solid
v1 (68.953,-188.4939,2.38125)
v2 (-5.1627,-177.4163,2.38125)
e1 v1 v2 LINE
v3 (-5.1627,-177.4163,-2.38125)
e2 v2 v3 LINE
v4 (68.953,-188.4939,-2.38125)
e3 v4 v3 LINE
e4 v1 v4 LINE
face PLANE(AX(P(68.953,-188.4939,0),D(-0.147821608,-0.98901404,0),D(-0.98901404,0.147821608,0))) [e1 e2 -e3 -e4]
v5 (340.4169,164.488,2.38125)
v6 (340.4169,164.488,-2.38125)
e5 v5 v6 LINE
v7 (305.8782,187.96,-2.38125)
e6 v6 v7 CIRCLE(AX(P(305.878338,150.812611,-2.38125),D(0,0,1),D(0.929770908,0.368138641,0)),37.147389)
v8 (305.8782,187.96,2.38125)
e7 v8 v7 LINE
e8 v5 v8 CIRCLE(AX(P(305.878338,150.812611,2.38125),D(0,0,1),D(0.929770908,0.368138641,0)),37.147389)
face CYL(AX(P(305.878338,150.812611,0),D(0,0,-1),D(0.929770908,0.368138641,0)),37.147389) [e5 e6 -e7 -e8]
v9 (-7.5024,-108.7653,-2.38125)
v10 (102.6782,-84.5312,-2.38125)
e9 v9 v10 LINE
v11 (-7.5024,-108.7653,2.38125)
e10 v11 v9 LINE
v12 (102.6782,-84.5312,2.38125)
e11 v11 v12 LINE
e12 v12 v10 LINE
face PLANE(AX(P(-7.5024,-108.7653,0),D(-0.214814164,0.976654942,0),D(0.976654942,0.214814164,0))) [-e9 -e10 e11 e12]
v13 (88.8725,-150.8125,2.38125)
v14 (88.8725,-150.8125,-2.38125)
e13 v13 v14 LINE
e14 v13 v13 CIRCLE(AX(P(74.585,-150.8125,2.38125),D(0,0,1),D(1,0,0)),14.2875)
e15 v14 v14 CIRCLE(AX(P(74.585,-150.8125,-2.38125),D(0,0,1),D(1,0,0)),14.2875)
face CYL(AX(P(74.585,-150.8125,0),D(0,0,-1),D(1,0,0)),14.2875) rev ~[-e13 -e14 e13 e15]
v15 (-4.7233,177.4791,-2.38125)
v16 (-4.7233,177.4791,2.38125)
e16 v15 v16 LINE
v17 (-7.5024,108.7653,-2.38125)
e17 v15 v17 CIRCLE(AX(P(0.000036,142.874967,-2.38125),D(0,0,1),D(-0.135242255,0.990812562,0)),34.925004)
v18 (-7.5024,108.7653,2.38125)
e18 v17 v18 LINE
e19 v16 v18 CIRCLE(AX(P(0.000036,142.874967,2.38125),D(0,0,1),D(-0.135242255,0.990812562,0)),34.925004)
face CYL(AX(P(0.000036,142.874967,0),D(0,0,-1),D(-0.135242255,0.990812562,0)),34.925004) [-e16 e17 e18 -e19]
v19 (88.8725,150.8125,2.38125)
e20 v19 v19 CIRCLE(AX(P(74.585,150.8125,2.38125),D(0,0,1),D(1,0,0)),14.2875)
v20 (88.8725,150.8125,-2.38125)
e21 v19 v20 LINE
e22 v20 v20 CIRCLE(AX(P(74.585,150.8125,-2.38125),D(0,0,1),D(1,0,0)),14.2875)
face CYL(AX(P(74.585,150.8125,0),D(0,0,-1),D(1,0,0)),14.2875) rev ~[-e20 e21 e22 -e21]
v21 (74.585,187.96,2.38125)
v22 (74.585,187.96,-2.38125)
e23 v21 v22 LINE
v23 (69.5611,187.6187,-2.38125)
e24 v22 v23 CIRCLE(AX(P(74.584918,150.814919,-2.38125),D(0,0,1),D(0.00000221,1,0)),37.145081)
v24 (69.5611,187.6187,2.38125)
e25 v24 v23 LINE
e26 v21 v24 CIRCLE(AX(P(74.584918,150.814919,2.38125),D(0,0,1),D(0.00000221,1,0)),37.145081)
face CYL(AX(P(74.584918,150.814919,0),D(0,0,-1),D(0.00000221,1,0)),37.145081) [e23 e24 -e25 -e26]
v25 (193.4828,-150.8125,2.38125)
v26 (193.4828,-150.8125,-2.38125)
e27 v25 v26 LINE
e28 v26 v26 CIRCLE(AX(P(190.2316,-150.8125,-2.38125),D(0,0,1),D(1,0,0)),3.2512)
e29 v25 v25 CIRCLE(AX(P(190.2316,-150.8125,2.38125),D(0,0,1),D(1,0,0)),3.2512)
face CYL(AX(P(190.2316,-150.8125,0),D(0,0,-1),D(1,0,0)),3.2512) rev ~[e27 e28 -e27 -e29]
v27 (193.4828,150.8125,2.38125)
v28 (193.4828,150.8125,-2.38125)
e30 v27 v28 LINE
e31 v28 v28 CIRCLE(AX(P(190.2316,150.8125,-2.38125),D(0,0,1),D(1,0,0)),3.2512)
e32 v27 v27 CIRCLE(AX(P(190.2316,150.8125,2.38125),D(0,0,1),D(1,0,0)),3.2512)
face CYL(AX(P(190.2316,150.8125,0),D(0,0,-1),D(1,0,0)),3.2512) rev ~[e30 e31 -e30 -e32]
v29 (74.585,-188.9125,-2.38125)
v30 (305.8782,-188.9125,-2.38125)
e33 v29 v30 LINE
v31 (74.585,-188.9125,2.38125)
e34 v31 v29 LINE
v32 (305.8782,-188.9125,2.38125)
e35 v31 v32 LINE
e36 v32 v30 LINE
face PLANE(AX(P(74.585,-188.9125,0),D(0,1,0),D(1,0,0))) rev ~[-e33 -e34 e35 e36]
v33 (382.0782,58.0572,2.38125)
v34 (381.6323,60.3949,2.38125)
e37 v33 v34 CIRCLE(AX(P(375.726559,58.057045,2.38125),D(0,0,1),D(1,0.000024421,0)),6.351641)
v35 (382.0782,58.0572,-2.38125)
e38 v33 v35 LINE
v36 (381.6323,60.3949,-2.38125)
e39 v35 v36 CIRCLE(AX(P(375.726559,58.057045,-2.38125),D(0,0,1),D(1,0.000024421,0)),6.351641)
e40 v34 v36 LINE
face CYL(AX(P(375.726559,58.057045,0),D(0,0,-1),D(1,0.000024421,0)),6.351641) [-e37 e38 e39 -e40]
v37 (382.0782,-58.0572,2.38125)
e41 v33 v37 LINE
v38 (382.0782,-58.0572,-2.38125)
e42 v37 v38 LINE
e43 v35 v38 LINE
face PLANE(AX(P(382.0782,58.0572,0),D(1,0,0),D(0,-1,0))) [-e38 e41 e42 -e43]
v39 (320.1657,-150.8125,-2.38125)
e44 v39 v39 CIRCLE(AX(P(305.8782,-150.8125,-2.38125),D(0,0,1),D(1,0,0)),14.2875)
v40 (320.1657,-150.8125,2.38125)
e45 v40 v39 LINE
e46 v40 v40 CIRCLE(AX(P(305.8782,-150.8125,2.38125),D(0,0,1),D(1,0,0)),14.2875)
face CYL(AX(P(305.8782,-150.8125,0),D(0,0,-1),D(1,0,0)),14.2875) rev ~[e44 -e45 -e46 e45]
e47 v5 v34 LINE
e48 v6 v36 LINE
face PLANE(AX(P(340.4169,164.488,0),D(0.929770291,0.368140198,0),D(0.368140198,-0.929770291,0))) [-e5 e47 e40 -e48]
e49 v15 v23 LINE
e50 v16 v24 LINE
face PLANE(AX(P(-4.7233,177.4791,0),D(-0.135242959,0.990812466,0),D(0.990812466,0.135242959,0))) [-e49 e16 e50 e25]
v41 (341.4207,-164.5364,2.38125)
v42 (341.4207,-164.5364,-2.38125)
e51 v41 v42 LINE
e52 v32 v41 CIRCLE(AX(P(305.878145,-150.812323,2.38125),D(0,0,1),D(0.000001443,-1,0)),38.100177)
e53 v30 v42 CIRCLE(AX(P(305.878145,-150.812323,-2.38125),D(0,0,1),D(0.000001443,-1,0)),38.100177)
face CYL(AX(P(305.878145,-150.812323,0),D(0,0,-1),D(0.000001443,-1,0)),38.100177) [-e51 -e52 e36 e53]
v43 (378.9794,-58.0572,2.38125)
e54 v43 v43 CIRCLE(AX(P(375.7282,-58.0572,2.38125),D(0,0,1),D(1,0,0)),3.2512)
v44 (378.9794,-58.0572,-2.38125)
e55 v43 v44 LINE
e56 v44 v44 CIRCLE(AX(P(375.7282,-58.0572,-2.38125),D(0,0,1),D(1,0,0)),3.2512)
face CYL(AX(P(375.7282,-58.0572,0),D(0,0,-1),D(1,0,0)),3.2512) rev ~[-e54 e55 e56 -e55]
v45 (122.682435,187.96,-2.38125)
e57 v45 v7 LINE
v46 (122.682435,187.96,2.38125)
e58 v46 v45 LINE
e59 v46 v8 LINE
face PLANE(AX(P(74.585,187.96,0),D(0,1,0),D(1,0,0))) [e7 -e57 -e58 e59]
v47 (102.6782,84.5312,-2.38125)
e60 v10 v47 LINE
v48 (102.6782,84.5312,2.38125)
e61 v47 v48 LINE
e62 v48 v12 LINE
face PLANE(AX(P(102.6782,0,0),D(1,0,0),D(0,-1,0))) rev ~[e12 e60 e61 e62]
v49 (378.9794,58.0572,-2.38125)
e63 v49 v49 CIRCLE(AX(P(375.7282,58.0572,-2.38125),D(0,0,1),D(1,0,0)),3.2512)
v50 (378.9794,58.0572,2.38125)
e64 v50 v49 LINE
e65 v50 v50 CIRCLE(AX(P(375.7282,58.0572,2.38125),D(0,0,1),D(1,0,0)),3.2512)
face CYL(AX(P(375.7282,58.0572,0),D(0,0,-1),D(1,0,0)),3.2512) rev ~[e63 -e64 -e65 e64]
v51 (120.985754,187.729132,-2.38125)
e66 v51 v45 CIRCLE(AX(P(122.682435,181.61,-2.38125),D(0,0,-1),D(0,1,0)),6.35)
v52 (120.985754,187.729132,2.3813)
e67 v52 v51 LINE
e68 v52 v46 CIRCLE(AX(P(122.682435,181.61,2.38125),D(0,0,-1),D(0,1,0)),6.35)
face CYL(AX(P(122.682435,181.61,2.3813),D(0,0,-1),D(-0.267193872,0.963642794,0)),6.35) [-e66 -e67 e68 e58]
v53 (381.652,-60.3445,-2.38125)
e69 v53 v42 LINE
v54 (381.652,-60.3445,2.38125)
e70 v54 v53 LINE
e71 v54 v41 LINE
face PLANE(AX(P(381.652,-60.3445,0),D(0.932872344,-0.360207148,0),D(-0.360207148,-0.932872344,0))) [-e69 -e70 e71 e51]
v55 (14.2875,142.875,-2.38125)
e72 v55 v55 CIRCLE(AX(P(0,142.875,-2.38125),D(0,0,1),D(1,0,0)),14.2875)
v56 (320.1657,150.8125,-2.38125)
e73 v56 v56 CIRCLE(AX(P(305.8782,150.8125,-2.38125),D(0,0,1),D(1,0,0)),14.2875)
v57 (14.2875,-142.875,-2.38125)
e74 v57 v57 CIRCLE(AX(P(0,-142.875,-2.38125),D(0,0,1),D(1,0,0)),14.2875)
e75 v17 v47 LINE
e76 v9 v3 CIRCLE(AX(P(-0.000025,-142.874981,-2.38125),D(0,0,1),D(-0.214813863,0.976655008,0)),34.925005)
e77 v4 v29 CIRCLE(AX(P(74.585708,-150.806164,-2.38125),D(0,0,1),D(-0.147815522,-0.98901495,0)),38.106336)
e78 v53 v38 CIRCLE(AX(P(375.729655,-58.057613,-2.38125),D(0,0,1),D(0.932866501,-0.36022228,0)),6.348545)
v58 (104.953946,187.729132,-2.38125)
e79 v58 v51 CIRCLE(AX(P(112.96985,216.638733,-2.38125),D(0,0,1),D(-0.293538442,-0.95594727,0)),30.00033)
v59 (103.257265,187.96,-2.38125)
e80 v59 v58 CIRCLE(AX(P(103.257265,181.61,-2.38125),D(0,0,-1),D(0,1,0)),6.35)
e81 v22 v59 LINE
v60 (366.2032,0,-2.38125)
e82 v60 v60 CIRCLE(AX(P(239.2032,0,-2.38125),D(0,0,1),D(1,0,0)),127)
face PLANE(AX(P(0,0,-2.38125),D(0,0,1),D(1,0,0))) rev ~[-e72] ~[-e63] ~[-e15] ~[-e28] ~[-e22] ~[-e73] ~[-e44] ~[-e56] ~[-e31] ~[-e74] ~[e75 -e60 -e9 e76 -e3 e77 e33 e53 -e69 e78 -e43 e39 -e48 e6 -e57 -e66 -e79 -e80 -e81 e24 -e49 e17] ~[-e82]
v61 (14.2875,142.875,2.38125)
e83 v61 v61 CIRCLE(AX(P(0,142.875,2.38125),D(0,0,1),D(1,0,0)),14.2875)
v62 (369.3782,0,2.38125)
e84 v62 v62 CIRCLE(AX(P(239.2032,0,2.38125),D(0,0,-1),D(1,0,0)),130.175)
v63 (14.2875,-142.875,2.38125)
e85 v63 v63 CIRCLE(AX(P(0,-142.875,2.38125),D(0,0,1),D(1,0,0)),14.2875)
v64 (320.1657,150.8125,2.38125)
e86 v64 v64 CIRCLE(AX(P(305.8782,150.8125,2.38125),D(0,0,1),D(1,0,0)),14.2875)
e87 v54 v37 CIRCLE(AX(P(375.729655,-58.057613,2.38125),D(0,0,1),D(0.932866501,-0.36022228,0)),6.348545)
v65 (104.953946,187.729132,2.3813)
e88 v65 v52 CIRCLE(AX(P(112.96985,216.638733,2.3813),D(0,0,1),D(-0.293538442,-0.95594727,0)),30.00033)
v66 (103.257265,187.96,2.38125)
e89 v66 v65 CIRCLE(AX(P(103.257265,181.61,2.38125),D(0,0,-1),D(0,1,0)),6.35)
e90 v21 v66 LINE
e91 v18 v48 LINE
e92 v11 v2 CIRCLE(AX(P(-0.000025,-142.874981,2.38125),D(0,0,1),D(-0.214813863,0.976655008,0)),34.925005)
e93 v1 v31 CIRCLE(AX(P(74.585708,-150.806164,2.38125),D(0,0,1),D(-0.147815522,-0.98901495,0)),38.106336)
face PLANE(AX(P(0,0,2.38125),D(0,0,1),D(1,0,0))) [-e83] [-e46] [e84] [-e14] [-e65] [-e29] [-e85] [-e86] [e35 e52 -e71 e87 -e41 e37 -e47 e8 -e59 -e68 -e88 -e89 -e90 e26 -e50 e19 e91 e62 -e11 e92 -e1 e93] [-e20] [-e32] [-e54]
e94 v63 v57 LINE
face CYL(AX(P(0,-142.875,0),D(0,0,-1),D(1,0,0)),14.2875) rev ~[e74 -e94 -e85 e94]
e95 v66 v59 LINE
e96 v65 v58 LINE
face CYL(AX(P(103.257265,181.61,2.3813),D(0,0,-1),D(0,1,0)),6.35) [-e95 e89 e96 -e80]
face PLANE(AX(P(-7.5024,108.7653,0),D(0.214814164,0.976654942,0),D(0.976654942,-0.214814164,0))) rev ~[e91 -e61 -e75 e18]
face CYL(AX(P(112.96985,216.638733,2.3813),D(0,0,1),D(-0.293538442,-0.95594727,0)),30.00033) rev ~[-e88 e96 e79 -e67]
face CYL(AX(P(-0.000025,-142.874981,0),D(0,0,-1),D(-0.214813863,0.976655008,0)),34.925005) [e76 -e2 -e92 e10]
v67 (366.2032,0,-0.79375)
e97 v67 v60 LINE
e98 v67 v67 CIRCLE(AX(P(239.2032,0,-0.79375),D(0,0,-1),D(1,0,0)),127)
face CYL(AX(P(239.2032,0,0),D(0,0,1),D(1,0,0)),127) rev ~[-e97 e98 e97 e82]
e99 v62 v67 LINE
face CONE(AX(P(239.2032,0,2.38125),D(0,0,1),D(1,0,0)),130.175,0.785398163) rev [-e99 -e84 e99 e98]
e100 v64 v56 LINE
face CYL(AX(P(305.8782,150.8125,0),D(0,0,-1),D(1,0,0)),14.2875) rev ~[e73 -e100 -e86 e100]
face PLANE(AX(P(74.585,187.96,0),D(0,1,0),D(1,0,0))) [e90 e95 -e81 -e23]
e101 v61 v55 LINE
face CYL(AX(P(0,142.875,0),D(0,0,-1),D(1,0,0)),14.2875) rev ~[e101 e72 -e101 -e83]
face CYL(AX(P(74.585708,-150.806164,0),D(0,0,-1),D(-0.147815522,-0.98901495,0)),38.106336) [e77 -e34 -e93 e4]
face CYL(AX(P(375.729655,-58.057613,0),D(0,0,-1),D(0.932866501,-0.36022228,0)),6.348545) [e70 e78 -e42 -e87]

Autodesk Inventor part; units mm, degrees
ref_plane "YZ Plane" through (0, 0, 0) normal (1, 0, 0) x (0, 1, 0)
ref_plane "XZ Plane" through (0, 0, 0) normal (0, 1, 0) x (-1, 0, 0)
ref_plane "XY Plane" through (0, 0, 0) normal (0, 0, 1) x (1, 0, 0)
sketch "Sketch1" plane through (0, 0, 0) normal (0, 0, 1) x (1, 0, 0)
  circle A0 centre (0, 142.875) radius 63.5 construction
  circle A1 centre (0, 142.875) radius 25.4 construction
  circle A2 centre (0, -142.875) radius 25.4 construction
  circle A3 centre (0, -142.875) radius 63.5 construction
  line L0 (0, 79.375) -> (0, 79.375) construction
  line L1 (0, -79.375) -> (0, -79.375) construction
  line L2 (0, 0) -> (229.6782, 0) construction
  line L3 (0, 142.875) -> (305.8782, 142.875) construction
  line L4 (305.8782, 142.875) -> (305.8782, -142.875) construction
  line L5 (305.8782, -142.875) -> (0, -142.875) construction
  circle A4 centre (229.6782, 0) radius 127 construction
  circle A5 centre (0, 142.875) radius 14.2875
  circle A6 centre (0, -142.875) radius 14.2875
  circle A7 centre (0, 142.875) radius 34.925 construction
  circle A8 centre (0, -142.875) radius 34.925 construction
  circle A9 centre (74.585, -150.8125) radius 22.225 construction
  circle A10 centre (74.585, -150.8125) radius 33.3375 construction
  circle A11 centre (74.585, -150.8125) radius 11.1125 construction
  line L6 (74.585, -139.7) -> (74.585, -128.5875) construction
  line L7 (74.585, -117.475) -> (74.585, -128.5875) construction
  circle A12 centre (305.8782, -150.8125) radius 33.3375 construction
  circle A13 centre (305.8782, -150.8125) radius 14.2875
  circle A14 centre (375.7282, 58.0572) radius 6.35 construction
  circle A15 centre (375.7282, -58.0572) radius 6.35 construction
  line L8 (305.8782, 150.8125) -> (375.7282, 58.0572) construction
  line L9 (375.7282, 58.0572) -> (375.7282, -58.0572) construction
  line L10 (375.7282, -58.0572) -> (305.8782, -150.8125) construction
  line L11 (-117.6668, 84.5312) -> (102.6782, 84.5312) construction
  line L12 (102.6782, 84.5312) -> (102.6782, -84.5312) construction
  line L13 (102.6782, -84.5312) -> (-117.6668, -84.5312) construction
  line L14 (-117.6668, -84.5312) -> (-117.6668, 84.5312) construction
  line L15 (0, 142.875) -> (0, 84.5312) construction
  line L16 (0, -84.5312) -> (0, -142.875) construction
  circle A16 centre (74.585, -150.8125) radius 14.2875
  line L17 (74.585, -117.475) -> (305.8782, -117.475) construction
  circle A17 centre (74.585, 0) radius 127 construction
  circle A18 centre (0, 0) radius 127 construction
  circle A19 centre (0, 142.875) radius 6.35 construction
  circle A20 centre (74.585, 150.8125) radius 33.3375 construction
  circle A21 centre (305.8782, 150.8125) radius 33.3375 construction
  circle A22 centre (305.8782, 150.8125) radius 14.2875
  circle A23 centre (74.585, 150.8125) radius 14.2875
  circle A24 centre (74.585, 150.8125) radius 37.1475 construction
  circle A25 centre (305.8782, 150.8125) radius 37.1475 construction
  circle A26 centre (305.8782, -150.8125) radius 38.1 construction
  circle A27 centre (74.585, -150.8125) radius 38.1 construction
  line L18 (-4.7233, 177.4791) -> (69.5611, 187.6187)
  line L19 (74.585, 187.96) -> (305.8782, 187.96)
  line L20 (340.4169, 164.488) -> (381.6323, 60.3949)
  line L21 (382.0782, 58.0572) -> (382.0782, -58.0572)
  line L22 (68.953, -188.4939) -> (-5.1627, -177.4163)
  line L23 (221.4945, -245.7989) -> (238.8691, -293.5353) construction
  line L24 (238.8691, -293.5353) -> (382.0782, -241.4114) construction
  line L25 (382.0782, -241.4114) -> (364.7036, -193.675) construction
  line L26 (364.7036, -193.675) -> (221.4945, -245.7989) construction
  line L27 (-7.5024, -108.7653) -> (102.6782, -84.5312)
  line L28 (-7.5024, 108.7653) -> (102.6782, 84.5312)
  line L29 (102.6782, 84.5312) -> (102.6782, -84.5312)
  circle A28 centre (239.2032, 0) radius 127
  line L30 (102.6782, 0) -> (112.2032, 0)
  line L31 (375.7282, 0) -> (366.2032, 0)
  circle A29 centre (221.4945, -245.7989) radius 3.2512 construction
  circle A30 centre (269.2308, -228.4242) radius 3.2512 construction
  circle A31 centre (316.9672, -211.0496) radius 3.2512 construction
  circle A32 centre (364.7036, -193.675) radius 3.2512 construction
  circle A33 centre (238.8691, -293.5353) radius 3.2512 construction
  circle A34 centre (286.6055, -276.1606) radius 3.2512 construction
  circle A35 centre (334.3418, -258.786) radius 3.2512 construction
  circle A36 centre (382.0782, -241.4114) radius 3.2512 construction
  line L32 (74.585, -188.9125) -> (305.8782, -188.9125)
  line L33 (381.652, -60.3445) -> (341.4207, -164.5364)
  arc A37 (-4.7233, 177.4791) -> (-7.5024, 108.7653) centre (0, 142.875) ccw
  arc A38 (74.585, 187.96) -> (69.5611, 187.6187) centre (74.585, 150.8125) ccw
  arc A39 (340.4169, 164.488) -> (305.8782, 187.96) centre (305.8782, 150.8125) ccw
  arc A40 (382.0782, 58.0572) -> (381.6323, 60.3949) centre (375.7282, 58.0572) ccw
  arc A41 (381.652, -60.3445) -> (382.0782, -58.0572) centre (375.7282, -58.0572) ccw
  arc A42 (305.8782, -188.9125) -> (341.4207, -164.5364) centre (305.8782, -150.8125) ccw
  arc A43 (68.953, -188.4939) -> (74.585, -188.9125) centre (74.585, -150.8125) ccw
  arc A44 (-7.5024, -108.7653) -> (-5.1627, -177.4163) centre (0, -142.875) ccw
  circle A45 centre (375.7282, 58.0572) radius 3.2512
  circle A46 centre (375.7282, -58.0572) radius 3.2512
  circle A47 centre (190.2316, 150.8125) radius 3.2512
  line L34 (74.585, 150.8125) -> (190.2316, 150.8125) construction
  line L35 (190.2316, 150.8125) -> (305.8782, 150.8125) construction
  circle A48 centre (190.2316, -150.8125) radius 3.2512
  point P0 (0, 117.475)
  point P1 (0, -117.475)
  point P2 (305.8782, 0)
  point P3 (229.6782, -127)
  point P4 (229.6782, -127)
  point P5 (356.6782, 0)
  point P6 (0, 127)
  point P7 (0, 117.475)
  point P8 (0, 136.525)
  dimension "d1" = 50.8
  dimension "d16" = 44.45
  dimension "d20" = 22.225
  dimension "d33" = 12.7
  dimension "d0" = 127
  dimension "d3" = 285.75
  dimension "d4" = 254
  dimension "d6" = 158.75
  dimension "d7" = 234.95
  dimension "d11" = 28.575
  dimension "d12" = 28.575
  dimension "d13" = 69.85
  dimension "d14" = 69.85
  dimension "d19" = 76.2
  dimension "d24" = 28.575
  dimension "d26" = 12.7
  dimension "d27" = 12.7
  dimension "d28" = 19.05
  dimension "d29" = 220.345
  dimension "d30" = 169.0624
  dimension "d31" = 9.525
  dimension "d32" = 75.0062
  dimension "d34" = 9.525
  dimension "d35" = 19.05
  dimension "d37" = 3.81
  dimension "d38" = 3.81
  dimension "d39" = 4.7625
  dimension "d40" = 4.7625
  dimension "d43" = 20
  dimension "d44" = 6.5024
  dimension "d47" = 50.8
  dimension "d50" = 50.8
  dimension "d53" = 50.8
  dimension "d56" = 6.5024
  dimension "d57" = 6.5024
  dimension "d58" = 6.5024
  dimension "d108" = 231.2932
extrude "Extrusion1" add sketch "Sketch1" along normal mid plane 4.7625
sketch "Sketch2" plane through (0, 0, -2.3813) normal (0, 0, -1) x (-1, 0, 0)
  line L0 (7.5024, -108.7653) -> (-102.6782, -84.5312) projected
  line L1 (-102.6782, -84.5312) -> (-102.6782, 84.5312) projected
  line L2 (-102.6782, 84.5312) -> (7.5024, 108.7653) projected
  arc A0 (7.5024, 108.7653) -> (4.7233, 177.4791) centre (0, 142.875) ccw projected
  line L3 (4.7233, 177.4791) -> (-69.5611, 187.6187) projected
  arc A1 (-69.5611, 187.6187) -> (-74.585, 187.96) centre (-74.585, 150.8125) ccw projected
  line L4 (-74.585, 187.96) -> (-305.8782, 187.96) projected
  arc A2 (-305.8782, 187.96) -> (-340.4169, 164.488) centre (-305.8782, 150.8125) ccw projected
  line L5 (-340.4169, 164.488) -> (-381.6323, 60.3949) projected
  arc A3 (-381.6323, 60.3949) -> (-382.0782, 58.0572) centre (-375.7282, 58.0572) ccw projected
  line L6 (-382.0782, 58.0572) -> (-382.0782, -58.0572) projected
  arc A4 (-382.0782, -58.0572) -> (-381.652, -60.3445) centre (-375.7282, -58.0572) ccw projected
  line L7 (-381.652, -60.3445) -> (-341.4207, -164.5364) projected
  arc A5 (-341.4207, -164.5364) -> (-305.8782, -188.9125) centre (-305.8782, -150.8125) ccw projected
  line L8 (-305.8782, -188.9125) -> (-74.585, -188.9125) projected
  arc A6 (-74.585, -188.9125) -> (-68.953, -188.4939) centre (-74.585, -150.8125) ccw projected
  line L9 (-68.953, -188.4939) -> (5.1627, -177.4163) projected
  arc A7 (5.1627, -177.4163) -> (7.5024, -108.7653) centre (0, -142.875) ccw projected
  circle A8 centre (-239.2032, 0) radius 127 projected
  circle A9 centre (-74.585, -150.8125) radius 14.2875 projected
  circle A10 centre (-74.585, 150.8125) radius 14.2875 projected
  circle A11 centre (-190.2316, 150.8125) radius 3.2512 projected
  circle A12 centre (-190.2316, -150.8125) radius 3.2512 projected
  circle A13 centre (-375.7282, -58.0572) radius 3.2512 projected
  circle A14 centre (-375.7282, 58.0572) radius 3.2512 projected
  circle A15 centre (-305.8782, 150.8125) radius 14.2875 projected
  circle A16 centre (-305.8782, -150.8125) radius 14.2875 projected
  circle A17 centre (0, -142.875) radius 14.2875 projected
  circle A18 centre (0, 142.875) radius 14.2875 projected
  line L10 (-107.4407, -88.36) -> (6.4793, -113.4166)
  arc A19 (4.4587, -172.7061) -> (6.4793, -113.4166) centre (0, -142.875) ccw
  line L11 (4.4587, -172.7061) -> (-69.657, -183.7838)
  arc A20 (-74.585, -184.15) -> (-69.657, -183.7838) centre (-74.585, -150.8125) ccw
  line L12 (-74.585, -184.15) -> (-305.8782, -184.15)
  arc A21 (-336.9779, -162.8209) -> (-305.8782, -184.15) centre (-305.8782, -150.8125) ccw
  line L13 (-336.9779, -162.8209) -> (-377.2092, -58.6291)
  arc A22 (-377.3157, -58.0572) -> (-377.2092, -58.6291) centre (-375.7282, -58.0572) ccw
  line L14 (-377.3157, -58.0572) -> (-377.3157, 58.0572)
  arc A23 (-377.2042, 58.6416) -> (-377.3157, 58.0572) centre (-375.7282, 58.0572) ccw
  line L15 (-377.2042, 58.6416) -> (-335.9888, 162.7347)
  arc A24 (-305.8782, 183.1975) -> (-335.9888, 162.7347) centre (-305.8782, 150.8125) ccw
  line L16 (-305.8782, 183.1975) -> (-74.585, 183.1975)
  arc A25 (-70.2052, 182.9) -> (-74.585, 183.1975) centre (-74.585, 150.8125) ccw
  line L17 (-70.2052, 182.9) -> (4.0793, 172.7604)
  arc A26 (6.4793, 113.4166) -> (4.0793, 172.7604) centre (0, 142.875) ccw
  line L18 (6.4793, 113.4166) -> (-107.4407, 88.36)
  line L19 (-107.4407, 88.36) -> (-107.4407, -88.36)
  circle A27 centre (-239.2032, 0) radius 133.35
  circle A28 centre (-74.585, 150.8125) radius 19.05
  circle A29 centre (0, 142.875) radius 19.05
  circle A30 centre (-190.2316, 150.8125) radius 8.0137
  circle A31 centre (-305.8782, 150.8125) radius 19.05
  circle A32 centre (-375.7282, 58.0572) radius 8.0137
  circle A33 centre (-375.7282, -58.0572) radius 8.0137
  circle A34 centre (-305.8782, -150.8125) radius 19.05
  circle A35 centre (-190.2316, -150.8125) radius 8.0137
  circle A36 centre (-74.585, -150.8125) radius 19.05
  circle A37 centre (0, -142.875) radius 19.05
  line L20 (0, -142.875) -> (-74.585, -150.8125)
  line L21 (-74.585, -150.8125) -> (-71.7613, -188.8077)
  line L22 (-74.585, -150.8125) -> (-102.6782, -84.5312)
  line L23 (-74.585, -150.8125) -> (-190.2316, -150.8125)
  line L24 (-190.2316, -150.8125) -> (-190.2316, -188.9125)
  line L25 (-190.2316, -150.8125) -> (-305.8782, -150.8125)
  line L26 (-305.8782, -150.8125) -> (-327.4274, -182.233)
  line L27 (-102.6782, -84.5312) -> (-239.2032, 0)
  line L28 (-239.2032, 0) -> (-190.2316, -150.8125)
  line L29 (-305.8782, -150.8125) -> (-239.2032, 0)
  line L30 (-239.2032, 0) -> (-375.7282, -58.0572)
  line L31 (-239.2032, 0) -> (-375.7282, 58.0572)
  line L32 (-375.7282, 58.0572) -> (-305.8782, 150.8125)
  line L33 (-305.8782, 150.8125) -> (-190.2316, 150.8125)
  line L34 (-190.2316, 150.8125) -> (-74.585, 150.8125)
  line L35 (-74.585, 150.8125) -> (0, 142.875)
  line L36 (-102.6782, -84.5312) -> (-190.2316, -150.8125)
  line L37 (-305.8782, -150.8125) -> (-375.7282, -58.0572)
  line L38 (-102.6782, 84.5312) -> (-74.585, 150.8125)
  line L39 (-102.6782, 84.5312) -> (-190.2316, 150.8125)
  line L40 (-102.6782, 84.5312) -> (-239.2032, 0)
  line L41 (-239.2032, 0) -> (-190.2316, 150.8125)
  line L42 (-239.2032, 0) -> (-305.8782, 150.8125)
  line L43 (-4.7625, -138.5924) -> (-75.089, -146.0767)
  line L44 (-68.936, -151.9364) -> (-99.5574, -79.6902)
  line L45 (0, -142.875) -> (0, -111.9915)
  line L46 (-4.7625, -110.944) -> (-4.7625, -138.5924)
  line L47 (0, 142.875) -> (0, 111.9915)
  line L48 (-99.5574, 79.6902) -> (-68.936, 151.9364)
  line L49 (-108.3272, 83.4073) -> (-77.7058, 155.6535)
  line L50 (-190.2316, 146.05) -> (-74.585, 146.05)
  line L51 (-98.0687, 87.0149) -> (-189.092, 155.923)
  line L52 (-105.1853, 88.5804) -> (-241.7103, 4.0492)
  line L53 (-103.8179, 79.4207) -> (-194.8411, 148.3288)
  line L54 (-235.7016, -4.6369) -> (-184.6739, 152.5077)
  line L55 (-244.761, -1.6952) -> (-193.7332, 155.4494)
  line L56 (-305.8782, 146.05) -> (-190.2316, 146.05)
  line L57 (-233.5511, -1.0064) -> (-302.8187, 155.6703)
  line L58 (-242.2627, -4.8578) -> (-311.5303, 151.8189)
  line L59 (-300.8665, 149.5508) -> (-368.2605, 60.0568)
  line L60 (-368.2605, 60.0568) -> (-236.9729, 4.2268)
  line L61 (-240.7003, -4.5386) -> (-383.1959, 56.0576)
  line L62 (-383.1959, 56.0576) -> (-308.4753, 155.2807)
  line L63 (-240.7003, 4.5386) -> (-383.1959, -56.0576)
  line L64 (-383.1959, -56.0576) -> (-308.4753, -155.2807)
  line L65 (-236.9729, -4.2268) -> (-368.2605, -60.0568)
  line L66 (-368.2605, -60.0568) -> (-300.8665, -149.5508)
  line L67 (-311.5303, -151.8189) -> (-242.2627, 4.8578)
  line L68 (-244.761, 1.6952) -> (-193.7332, -155.4494)
  line L69 (-235.7016, 4.6369) -> (-184.6739, -152.5077)
  line L70 (-302.8187, -155.6703) -> (-233.5511, 1.0064)
  line L71 (-105.1853, -88.5804) -> (-241.7103, -4.0492)
  line L72 (-100.1711, -80.482) -> (-236.6961, 4.0492)
  line L73 (-100.1711, 80.482) -> (-236.6961, -4.0492)
  line L74 (-77.7058, -155.6535) -> (-108.3272, -83.4073)
  line L75 (-105.5995, -80.7694) -> (-196.6227, -149.6775)
  line L76 (-98.0687, -87.0149) -> (-189.092, -155.923)
  line L77 (-74.585, -146.05) -> (-190.2316, -146.05)
  line L78 (-190.2316, -146.05) -> (-305.8782, -146.05)
  line L79 (-75.089, 146.0767) -> (-4.7625, 138.5924)
  line L80 (-4.7625, 138.5924) -> (-4.7625, 110.944)
  arc A38 (-377.3157, -6.35) -> (-372.4074, -6.2352) centre (-374.8602, -6.35) ccw
  arc A39 (-372.4074, 6.2352) -> (-377.3157, 6.35) centre (-374.8602, 6.35) ccw
  line L81 (-239.2032, 0) -> (-366.2032, 0)
  point P0 (0, 0)
  dimension "d59" = 4.7625
  dimension "d60" = 6.35
  dimension "d61" = 4.7625
  dimension "d62" = 4.7625
  dimension "d63" = 4.7625
  dimension "d64" = 4.7625
  dimension "d65" = 4.7625
  dimension "d66" = 4.7625
  dimension "d67" = 4.7625
  dimension "d68" = 4.7625
  dimension "d69" = 4.7625
  dimension "d70" = 4.7625
  dimension "d71" = 4.7625
  dimension "d72" = 4.7625
  dimension "d73" = 4.7625
  dimension "d75" = 4.7625
  dimension "d76" = 4.7625
  dimension "d77" = 4.7625
  dimension "d78" = 4.7625
  dimension "d79" = 4.7625
  dimension "d80" = 4.7625
  dimension "d81" = 4.7625
  dimension "d82" = 4.7625
  dimension "d83" = 4.7625
  dimension "d84" = 4.7625
  dimension "d85" = 4.7625
  dimension "d86" = 4.7625
  dimension "d87" = 4.7625
  dimension "d88" = 4.7625
  dimension "d89" = 4.7625
  dimension "d90" = 4.7625
  dimension "d91" = 4.7625
  dimension "d92" = 4.7625
  dimension "d93" = 4.7625
  dimension "d94" = 4.7625
  dimension "d95" = 4.7625
  dimension "d96" = 4.7625
  dimension "d97" = 4.7625
  dimension "d98" = 4.7625
  dimension "d99" = 4.7625
  dimension "d100" = 4.7625
  dimension "d101" = 4.7625
  dimension "d102" = 4.7625
  dimension "d103" = 4.7625
  dimension "d104" = 12.7
chamfer "Chamfer1" distance 3.175 distance2 3.175 1 edges at (112.2032, 0, 2.3813) measured on face at (190.101, -177.2883, 2.3812)
sketch "Sketch3" plane through (0, 0, 2.3813) normal (0, 0, 1) x (1, 0, 0)
  line L0 (305.8782, 187.96) -> (74.585, 187.96) projected
  arc A0 (104.1636, 187.96) -> (121.7761, 187.96) centre (112.9698, 216.6384) ccw
  circle A1 centre (117.1583, 219.0822) radius 4 projected
  circle A2 centre (112.9698, 216.6384) radius 2.0193 projected
  point P0 (0, 0)
  dimension "d109" = 30
extrude "Extrusion2" cut sketch "Sketch3" against normal blind 25.4 contours A0 L0
fillet "Fillet1" radius 6.35 2 edges at (104.1636, 187.96, 0) (121.7761, 187.96, 0)
properties part number "OUTK_002_ShotPlateReceptacle" material "Aluminum 6061"
